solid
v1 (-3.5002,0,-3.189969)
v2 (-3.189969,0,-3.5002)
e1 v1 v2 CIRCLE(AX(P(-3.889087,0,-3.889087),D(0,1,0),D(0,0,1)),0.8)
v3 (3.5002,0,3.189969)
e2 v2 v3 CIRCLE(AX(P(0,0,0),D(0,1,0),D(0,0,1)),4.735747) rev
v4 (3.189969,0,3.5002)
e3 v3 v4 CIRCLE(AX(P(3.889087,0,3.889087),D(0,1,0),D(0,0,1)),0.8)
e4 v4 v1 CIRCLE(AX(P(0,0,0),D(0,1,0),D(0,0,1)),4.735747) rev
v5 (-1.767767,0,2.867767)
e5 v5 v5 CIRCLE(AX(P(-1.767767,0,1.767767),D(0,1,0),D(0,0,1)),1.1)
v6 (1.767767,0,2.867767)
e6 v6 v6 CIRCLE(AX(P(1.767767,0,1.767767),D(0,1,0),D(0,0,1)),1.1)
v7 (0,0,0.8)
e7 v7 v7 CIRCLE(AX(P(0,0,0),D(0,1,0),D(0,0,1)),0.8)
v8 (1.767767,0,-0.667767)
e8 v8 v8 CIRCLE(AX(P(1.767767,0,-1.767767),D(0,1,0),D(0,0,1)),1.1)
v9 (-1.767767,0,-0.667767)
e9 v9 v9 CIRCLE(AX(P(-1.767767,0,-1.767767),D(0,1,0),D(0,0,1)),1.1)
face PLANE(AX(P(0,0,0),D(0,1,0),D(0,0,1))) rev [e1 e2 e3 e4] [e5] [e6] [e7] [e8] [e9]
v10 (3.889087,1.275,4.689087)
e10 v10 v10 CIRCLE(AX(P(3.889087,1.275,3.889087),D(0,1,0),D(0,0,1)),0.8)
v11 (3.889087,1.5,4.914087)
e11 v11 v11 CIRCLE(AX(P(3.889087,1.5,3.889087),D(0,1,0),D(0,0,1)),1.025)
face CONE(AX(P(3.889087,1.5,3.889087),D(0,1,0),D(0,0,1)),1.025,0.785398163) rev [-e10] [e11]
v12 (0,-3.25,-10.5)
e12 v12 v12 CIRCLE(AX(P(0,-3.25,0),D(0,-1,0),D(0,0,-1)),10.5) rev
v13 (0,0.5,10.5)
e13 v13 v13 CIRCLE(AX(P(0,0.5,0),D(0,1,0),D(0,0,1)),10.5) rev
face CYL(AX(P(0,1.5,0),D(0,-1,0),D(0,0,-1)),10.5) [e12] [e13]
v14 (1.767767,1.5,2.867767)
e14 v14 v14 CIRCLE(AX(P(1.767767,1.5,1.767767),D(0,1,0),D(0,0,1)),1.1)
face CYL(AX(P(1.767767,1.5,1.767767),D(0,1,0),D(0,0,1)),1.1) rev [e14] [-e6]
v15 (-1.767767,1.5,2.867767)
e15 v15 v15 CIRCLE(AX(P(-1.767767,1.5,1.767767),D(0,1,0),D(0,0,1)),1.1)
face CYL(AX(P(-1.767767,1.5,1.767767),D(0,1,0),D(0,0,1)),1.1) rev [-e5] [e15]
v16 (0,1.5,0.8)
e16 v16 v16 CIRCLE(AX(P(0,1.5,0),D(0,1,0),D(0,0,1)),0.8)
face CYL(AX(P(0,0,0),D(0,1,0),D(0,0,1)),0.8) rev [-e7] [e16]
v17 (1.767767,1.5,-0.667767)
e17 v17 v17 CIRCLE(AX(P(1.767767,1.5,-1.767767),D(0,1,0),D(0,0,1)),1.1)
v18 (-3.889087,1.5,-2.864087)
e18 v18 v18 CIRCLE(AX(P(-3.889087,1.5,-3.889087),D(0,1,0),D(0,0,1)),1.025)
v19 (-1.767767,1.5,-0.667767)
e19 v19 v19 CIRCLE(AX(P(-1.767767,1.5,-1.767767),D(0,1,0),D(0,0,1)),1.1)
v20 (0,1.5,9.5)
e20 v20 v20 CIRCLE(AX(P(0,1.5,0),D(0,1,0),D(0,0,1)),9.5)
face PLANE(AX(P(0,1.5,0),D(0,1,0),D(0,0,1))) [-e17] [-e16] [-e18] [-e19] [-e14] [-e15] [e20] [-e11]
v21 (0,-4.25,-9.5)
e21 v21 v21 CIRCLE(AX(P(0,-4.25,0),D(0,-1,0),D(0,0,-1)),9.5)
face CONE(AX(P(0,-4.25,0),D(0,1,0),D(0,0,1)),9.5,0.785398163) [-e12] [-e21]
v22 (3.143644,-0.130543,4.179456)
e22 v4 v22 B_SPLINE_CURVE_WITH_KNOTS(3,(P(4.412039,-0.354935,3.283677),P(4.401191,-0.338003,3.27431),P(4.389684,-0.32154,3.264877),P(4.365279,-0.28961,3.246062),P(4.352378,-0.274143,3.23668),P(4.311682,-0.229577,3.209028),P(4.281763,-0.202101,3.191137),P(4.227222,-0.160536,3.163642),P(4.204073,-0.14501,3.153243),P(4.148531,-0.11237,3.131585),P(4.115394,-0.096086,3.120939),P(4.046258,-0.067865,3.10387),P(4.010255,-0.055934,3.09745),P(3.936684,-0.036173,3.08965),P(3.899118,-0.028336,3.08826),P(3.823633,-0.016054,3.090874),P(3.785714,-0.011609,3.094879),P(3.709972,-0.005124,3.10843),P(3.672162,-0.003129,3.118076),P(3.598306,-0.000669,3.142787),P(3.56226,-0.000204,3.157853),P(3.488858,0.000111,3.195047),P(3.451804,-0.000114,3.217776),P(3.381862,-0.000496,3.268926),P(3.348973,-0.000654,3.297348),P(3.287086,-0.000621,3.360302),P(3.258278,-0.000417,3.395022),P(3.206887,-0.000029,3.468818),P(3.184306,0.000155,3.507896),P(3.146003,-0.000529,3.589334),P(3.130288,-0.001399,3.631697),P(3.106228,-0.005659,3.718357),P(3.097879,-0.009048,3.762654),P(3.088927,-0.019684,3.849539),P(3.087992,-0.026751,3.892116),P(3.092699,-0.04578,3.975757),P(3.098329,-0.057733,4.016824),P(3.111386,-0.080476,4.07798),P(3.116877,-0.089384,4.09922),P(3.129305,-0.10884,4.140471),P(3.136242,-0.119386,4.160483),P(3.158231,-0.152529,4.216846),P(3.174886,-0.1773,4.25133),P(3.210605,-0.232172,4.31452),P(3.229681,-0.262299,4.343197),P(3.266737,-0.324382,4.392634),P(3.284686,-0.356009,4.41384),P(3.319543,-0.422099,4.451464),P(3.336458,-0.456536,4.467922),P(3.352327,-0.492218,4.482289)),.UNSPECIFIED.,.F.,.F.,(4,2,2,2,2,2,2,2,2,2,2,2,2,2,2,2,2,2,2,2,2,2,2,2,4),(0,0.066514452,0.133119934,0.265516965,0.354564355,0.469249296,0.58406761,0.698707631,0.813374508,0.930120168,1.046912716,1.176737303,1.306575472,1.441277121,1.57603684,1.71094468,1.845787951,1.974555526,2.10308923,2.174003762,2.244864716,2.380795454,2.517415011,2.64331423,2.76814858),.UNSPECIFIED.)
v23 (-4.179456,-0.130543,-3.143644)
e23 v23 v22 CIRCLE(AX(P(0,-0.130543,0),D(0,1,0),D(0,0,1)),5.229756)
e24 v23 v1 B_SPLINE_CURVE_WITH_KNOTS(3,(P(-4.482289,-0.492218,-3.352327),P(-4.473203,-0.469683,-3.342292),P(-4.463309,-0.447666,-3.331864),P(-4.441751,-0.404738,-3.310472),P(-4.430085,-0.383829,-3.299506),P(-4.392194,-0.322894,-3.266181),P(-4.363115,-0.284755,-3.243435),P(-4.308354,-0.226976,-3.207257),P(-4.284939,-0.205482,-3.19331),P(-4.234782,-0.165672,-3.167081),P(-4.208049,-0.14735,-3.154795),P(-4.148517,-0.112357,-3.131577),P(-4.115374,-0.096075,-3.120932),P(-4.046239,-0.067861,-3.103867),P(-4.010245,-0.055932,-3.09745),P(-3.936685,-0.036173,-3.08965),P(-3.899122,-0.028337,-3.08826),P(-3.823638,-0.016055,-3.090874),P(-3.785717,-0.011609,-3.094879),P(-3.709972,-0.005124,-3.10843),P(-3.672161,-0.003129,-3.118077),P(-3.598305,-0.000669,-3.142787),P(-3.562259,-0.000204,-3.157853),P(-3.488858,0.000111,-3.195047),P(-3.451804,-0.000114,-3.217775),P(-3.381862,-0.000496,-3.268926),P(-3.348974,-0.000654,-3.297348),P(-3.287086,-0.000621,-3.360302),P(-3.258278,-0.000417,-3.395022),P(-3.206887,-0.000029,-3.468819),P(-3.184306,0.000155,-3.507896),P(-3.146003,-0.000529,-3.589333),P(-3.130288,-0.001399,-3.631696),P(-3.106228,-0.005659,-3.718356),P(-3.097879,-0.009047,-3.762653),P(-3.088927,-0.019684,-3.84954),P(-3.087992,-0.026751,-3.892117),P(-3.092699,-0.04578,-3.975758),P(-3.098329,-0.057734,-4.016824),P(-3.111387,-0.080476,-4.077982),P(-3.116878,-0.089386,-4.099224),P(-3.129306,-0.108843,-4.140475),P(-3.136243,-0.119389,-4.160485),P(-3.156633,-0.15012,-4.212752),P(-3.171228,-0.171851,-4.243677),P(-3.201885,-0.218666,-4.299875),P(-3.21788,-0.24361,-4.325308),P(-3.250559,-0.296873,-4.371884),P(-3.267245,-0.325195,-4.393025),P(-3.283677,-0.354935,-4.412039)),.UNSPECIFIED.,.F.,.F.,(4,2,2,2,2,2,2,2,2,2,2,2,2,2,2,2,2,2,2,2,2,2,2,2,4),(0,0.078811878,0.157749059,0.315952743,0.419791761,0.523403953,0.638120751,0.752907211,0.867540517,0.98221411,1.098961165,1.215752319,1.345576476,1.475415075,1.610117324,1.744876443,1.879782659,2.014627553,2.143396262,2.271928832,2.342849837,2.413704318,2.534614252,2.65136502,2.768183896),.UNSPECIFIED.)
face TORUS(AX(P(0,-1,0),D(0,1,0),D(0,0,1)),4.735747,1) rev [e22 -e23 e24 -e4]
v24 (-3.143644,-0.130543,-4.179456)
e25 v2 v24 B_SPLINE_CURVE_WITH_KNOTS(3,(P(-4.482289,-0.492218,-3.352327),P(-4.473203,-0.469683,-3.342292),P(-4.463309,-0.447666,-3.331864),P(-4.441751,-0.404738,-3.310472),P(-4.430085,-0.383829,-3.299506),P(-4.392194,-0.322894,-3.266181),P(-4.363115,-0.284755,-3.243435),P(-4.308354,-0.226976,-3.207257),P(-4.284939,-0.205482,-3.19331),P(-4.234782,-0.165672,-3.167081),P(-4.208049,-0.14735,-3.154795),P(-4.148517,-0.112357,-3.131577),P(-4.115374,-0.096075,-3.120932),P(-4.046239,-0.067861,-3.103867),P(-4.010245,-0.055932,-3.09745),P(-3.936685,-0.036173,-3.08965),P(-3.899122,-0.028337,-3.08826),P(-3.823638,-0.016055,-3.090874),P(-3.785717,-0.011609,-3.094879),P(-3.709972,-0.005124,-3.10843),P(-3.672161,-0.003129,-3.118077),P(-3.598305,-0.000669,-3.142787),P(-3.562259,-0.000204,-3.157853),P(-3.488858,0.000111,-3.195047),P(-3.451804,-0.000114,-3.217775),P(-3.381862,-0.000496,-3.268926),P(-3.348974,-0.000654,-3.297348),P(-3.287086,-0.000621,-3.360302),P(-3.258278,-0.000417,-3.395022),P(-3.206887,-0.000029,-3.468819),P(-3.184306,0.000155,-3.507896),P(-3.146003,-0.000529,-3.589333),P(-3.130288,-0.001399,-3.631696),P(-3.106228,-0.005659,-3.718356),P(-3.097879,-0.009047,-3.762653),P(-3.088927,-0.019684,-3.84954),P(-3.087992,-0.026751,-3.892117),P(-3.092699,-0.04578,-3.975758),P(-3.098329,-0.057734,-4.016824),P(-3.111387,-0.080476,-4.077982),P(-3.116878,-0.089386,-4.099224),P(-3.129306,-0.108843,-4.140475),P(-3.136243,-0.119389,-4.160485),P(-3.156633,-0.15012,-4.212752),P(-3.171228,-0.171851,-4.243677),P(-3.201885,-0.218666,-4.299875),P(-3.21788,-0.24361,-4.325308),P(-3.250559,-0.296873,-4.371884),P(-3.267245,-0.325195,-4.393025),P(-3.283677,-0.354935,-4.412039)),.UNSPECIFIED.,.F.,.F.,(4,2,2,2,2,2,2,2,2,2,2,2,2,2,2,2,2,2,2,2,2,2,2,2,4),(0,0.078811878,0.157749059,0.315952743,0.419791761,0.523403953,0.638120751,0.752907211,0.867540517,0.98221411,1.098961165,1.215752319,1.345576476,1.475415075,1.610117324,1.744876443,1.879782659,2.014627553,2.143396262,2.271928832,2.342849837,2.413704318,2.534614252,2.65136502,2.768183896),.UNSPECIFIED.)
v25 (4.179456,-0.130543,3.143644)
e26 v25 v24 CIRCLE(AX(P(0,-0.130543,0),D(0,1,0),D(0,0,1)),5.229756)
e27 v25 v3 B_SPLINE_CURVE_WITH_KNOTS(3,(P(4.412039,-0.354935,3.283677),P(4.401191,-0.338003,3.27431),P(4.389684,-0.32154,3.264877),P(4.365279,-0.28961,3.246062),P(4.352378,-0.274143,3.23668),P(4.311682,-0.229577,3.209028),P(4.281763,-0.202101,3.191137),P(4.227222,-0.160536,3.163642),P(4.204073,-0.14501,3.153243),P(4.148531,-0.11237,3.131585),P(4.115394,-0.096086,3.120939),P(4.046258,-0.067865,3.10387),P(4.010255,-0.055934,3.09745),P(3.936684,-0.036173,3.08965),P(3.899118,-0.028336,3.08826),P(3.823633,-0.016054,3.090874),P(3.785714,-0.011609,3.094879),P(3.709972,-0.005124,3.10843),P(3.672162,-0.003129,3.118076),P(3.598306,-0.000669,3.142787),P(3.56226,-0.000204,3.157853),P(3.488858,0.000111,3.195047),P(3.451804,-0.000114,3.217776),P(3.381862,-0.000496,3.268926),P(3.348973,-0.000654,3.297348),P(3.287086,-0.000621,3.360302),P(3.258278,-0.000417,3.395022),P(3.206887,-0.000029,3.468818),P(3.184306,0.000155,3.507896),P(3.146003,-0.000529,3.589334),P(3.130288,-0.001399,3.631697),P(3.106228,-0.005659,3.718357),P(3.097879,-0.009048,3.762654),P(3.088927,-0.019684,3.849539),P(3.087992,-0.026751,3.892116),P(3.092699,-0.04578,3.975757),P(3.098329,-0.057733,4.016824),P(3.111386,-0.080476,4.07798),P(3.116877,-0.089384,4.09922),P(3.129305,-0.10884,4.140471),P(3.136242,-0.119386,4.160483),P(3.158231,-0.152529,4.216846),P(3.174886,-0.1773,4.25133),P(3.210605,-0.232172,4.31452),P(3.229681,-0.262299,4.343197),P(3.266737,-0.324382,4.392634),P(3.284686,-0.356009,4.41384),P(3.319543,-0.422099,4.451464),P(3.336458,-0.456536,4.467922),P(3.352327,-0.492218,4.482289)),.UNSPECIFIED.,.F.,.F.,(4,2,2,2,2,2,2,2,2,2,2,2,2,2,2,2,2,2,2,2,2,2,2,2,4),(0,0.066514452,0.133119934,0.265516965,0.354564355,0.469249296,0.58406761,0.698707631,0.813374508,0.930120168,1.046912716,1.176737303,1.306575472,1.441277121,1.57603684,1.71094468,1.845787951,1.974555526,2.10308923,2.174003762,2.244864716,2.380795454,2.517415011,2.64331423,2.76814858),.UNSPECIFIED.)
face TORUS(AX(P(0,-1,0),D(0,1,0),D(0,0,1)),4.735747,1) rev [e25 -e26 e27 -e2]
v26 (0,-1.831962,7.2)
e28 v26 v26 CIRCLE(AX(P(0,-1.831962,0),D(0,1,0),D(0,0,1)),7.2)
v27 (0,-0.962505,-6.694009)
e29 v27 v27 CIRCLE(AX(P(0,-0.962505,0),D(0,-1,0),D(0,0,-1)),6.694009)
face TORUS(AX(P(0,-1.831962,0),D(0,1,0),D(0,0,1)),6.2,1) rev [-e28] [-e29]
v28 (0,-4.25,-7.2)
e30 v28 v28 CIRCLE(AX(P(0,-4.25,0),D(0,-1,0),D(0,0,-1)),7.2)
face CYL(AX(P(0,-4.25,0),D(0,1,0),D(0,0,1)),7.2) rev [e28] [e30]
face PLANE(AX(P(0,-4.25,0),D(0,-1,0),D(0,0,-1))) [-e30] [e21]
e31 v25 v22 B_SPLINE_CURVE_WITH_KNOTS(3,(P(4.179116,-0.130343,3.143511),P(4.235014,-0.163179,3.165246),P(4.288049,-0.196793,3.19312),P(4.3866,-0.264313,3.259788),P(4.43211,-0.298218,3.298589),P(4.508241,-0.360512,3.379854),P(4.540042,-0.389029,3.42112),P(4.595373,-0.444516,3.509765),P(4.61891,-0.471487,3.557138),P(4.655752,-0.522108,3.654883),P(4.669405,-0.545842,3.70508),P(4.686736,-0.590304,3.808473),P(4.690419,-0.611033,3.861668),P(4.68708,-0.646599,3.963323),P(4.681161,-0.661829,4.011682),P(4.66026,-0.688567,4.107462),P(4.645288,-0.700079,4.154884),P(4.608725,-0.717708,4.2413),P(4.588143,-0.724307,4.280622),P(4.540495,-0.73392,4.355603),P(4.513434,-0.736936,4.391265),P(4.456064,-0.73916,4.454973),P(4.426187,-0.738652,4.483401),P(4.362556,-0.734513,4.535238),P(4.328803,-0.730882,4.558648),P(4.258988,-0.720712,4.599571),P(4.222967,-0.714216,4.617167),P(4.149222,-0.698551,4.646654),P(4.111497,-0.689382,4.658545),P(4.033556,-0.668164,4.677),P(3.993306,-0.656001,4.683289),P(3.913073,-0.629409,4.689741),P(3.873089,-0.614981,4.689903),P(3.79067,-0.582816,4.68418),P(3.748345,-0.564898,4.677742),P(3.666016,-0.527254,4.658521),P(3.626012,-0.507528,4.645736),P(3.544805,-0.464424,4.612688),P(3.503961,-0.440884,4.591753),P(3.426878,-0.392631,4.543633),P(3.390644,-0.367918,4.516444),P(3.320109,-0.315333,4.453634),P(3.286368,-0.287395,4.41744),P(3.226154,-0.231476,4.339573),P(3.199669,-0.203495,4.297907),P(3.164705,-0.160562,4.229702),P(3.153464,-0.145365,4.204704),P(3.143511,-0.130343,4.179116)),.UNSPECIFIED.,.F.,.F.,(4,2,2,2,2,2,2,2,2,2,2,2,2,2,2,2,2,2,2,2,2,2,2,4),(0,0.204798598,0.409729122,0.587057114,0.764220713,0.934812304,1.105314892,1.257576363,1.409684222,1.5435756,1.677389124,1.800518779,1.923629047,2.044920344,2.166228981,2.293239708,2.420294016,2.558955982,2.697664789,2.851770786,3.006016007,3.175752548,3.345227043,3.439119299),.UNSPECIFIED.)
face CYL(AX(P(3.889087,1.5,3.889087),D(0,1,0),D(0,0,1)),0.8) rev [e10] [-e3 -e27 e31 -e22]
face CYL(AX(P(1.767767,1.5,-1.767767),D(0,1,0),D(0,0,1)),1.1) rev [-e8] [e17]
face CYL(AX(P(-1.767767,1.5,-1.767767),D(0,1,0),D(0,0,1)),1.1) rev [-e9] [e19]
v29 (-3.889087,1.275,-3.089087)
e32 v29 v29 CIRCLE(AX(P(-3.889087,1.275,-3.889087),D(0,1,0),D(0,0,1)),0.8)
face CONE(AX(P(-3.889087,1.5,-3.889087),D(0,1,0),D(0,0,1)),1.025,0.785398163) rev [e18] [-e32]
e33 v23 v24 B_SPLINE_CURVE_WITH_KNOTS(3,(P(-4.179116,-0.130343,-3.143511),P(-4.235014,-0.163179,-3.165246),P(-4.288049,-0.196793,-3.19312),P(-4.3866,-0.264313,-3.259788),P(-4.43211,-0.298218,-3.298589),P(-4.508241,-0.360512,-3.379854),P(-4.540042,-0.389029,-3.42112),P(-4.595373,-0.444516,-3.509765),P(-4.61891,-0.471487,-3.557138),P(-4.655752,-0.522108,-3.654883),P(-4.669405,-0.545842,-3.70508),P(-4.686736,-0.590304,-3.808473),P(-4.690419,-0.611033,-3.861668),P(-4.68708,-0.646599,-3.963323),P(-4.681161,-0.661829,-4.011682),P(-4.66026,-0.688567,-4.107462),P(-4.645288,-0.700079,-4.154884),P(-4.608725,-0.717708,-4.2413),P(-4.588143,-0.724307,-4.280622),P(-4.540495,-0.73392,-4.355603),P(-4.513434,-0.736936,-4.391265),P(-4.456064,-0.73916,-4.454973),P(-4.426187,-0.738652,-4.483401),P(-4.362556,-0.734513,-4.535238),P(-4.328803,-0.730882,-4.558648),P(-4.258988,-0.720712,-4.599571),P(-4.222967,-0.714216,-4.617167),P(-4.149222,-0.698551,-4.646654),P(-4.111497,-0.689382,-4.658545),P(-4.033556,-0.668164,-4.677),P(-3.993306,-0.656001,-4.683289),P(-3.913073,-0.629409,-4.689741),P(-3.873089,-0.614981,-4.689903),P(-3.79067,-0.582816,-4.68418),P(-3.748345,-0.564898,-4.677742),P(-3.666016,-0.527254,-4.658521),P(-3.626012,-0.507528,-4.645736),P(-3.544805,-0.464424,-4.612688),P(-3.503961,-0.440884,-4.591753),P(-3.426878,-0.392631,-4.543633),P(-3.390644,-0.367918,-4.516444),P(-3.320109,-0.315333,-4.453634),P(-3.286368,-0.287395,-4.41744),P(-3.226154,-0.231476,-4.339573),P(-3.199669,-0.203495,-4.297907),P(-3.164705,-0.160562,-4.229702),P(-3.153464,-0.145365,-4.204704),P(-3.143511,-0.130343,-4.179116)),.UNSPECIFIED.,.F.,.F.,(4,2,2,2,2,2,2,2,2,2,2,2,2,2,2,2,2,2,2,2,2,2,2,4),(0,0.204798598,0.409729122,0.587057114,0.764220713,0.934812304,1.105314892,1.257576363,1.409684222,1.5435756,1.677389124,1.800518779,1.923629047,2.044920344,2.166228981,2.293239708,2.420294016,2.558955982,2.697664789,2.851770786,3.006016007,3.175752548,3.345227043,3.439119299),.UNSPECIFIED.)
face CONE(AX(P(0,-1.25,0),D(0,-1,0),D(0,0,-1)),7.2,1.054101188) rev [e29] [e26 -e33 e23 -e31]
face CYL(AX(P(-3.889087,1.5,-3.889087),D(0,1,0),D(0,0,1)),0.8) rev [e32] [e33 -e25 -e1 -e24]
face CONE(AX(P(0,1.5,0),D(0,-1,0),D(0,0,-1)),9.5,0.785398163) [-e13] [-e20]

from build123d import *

# Parameters (mm, degrees)
SKETCH1_R                       = 10.5
BOSS_EXTRUDE1_DEPTH             = 1.5
CUT_EXTRUDE1_DEPTH              = 15.924811557
CUT_EXTRUDE1_DEPTH_BACK         = 15.924811557
SKETCH2_R                       = 0.8
M2_CLEARANCE_HOLE1_D            = 2.2
M2_CLEARANCE_HOLE1_DEPTH        = 5
M2_CLEARANCE_HOLE1_TIP          = 0.660946681
BOSS_EXTRUDE2_START             = 3
SKETCH7_R                       = 10.5
SKETCH7_R_2                     = 7.2
BOSS_EXTRUDE2_DEPTH             = 3
FILLET1_R                       = 1
CHAMFER1_SIZE                   = 1
CHAMFER2_SIZE                   = 1
M2X0_4_TAPPED_HOLE1_D           = 1.6
M2X0_4_TAPPED_HOLE1_DEPTH       = 5.2
M2X0_4_TAPPED_HOLE1_CSINK_D     = 2.05
M2X0_4_TAPPED_HOLE1_CSINK_ANGLE = 90
M2X0_4_TAPPED_HOLE1_TIP         = 0.480688495


with BuildPart() as part:
    # Sketch1 → Boss-Extrude1 (new body)
    with BuildSketch(Plane(origin=(0, 0, 0), x_dir=(1, 0, 0), z_dir=(0, 1, 0))):
        Circle(SKETCH1_R)
    extrude(amount=BOSS_EXTRUDE1_DEPTH)

    # Sketch2 → Cut-Extrude1 (cut, two sides: drawn at the far end of the back side and taken through both)
    with BuildSketch(Plane(origin=(0, 1.5, 0), x_dir=(1, 0, 0), z_dir=(0, 1, 0)).offset(-CUT_EXTRUDE1_DEPTH_BACK)):
        Circle(SKETCH2_R)
    extrude(amount=CUT_EXTRUDE1_DEPTH + CUT_EXTRUDE1_DEPTH_BACK, mode=Mode.SUBTRACT)

    # M2 Clearance Hole1
    with Locations(Plane(origin=(0, 1.5, 0), x_dir=(1, 0, 0), z_dir=(0, 1, 0))):
        with Locations((-1.767766953, 1.767766953), (1.767766953, 1.767766953), (1.767766953, -1.767766953), (-1.767766953, -1.767766953)):
            Hole(M2_CLEARANCE_HOLE1_D / 2, depth=M2_CLEARANCE_HOLE1_DEPTH)
            with Locations((0, 0, -(M2_CLEARANCE_HOLE1_DEPTH + M2_CLEARANCE_HOLE1_TIP / 2))):  # 118° drill point
                Cone(0, M2_CLEARANCE_HOLE1_D / 2, M2_CLEARANCE_HOLE1_TIP, mode=Mode.SUBTRACT)

    # Sketch6 → Revolve1 (revolve)
    with BuildSketch(Plane.XY):
        Polygon((-10.5, 0), (-10.5, -1.25), (-7.2, -1.25), (-5, 0), align=None)
    revolve(axis=Axis((0, 0, 0), (0, -1, 0)))

    # Sketch7 → Boss-Extrude2 (add)
    with BuildSketch(Plane.XZ.offset(1.25).offset(BOSS_EXTRUDE2_START)):
        Circle(SKETCH7_R)
        Circle(SKETCH7_R_2, mode=Mode.SUBTRACT)
    extrude(amount=-BOSS_EXTRUDE2_DEPTH)

    # Fillet1
    fillet1_edges = [part.edges().sort_by_distance(p)[0] for p in [
        (5, 0, 0),
        (0, -1.25, 7.2),
    ]]
    fillet(fillet1_edges, radius=FILLET1_R)

    # Chamfer1
    chamfer1_edges = [part.edges().sort_by_distance(p)[0] for p in [
        (-10.5, 1.5, 0),
    ]]
    chamfer(chamfer1_edges, length=CHAMFER1_SIZE)

    # Chamfer2
    chamfer2_edges = [part.edges().sort_by_distance(p)[0] for p in [
        (-10.5, -4.25, 0),
    ]]
    chamfer(chamfer2_edges, length=CHAMFER2_SIZE)

    # M2x0.4 Tapped Hole1
    with Locations(Plane(origin=(0, 1.5, 0), x_dir=(1, 0, 0), z_dir=(0, 1, 0))):
        with Locations((-3.889087297, 3.889087297), (3.889087297, -3.889087297), (-1.767766953, 1.767766953)):
            CounterSinkHole(M2X0_4_TAPPED_HOLE1_D / 2, M2X0_4_TAPPED_HOLE1_CSINK_D / 2, depth=M2X0_4_TAPPED_HOLE1_DEPTH, counter_sink_angle=M2X0_4_TAPPED_HOLE1_CSINK_ANGLE)
            with Locations((0, 0, -(M2X0_4_TAPPED_HOLE1_DEPTH + M2X0_4_TAPPED_HOLE1_TIP / 2))):  # 118° drill point
                Cone(0, M2X0_4_TAPPED_HOLE1_D / 2, M2X0_4_TAPPED_HOLE1_TIP, mode=Mode.SUBTRACT)


solid = part.part
